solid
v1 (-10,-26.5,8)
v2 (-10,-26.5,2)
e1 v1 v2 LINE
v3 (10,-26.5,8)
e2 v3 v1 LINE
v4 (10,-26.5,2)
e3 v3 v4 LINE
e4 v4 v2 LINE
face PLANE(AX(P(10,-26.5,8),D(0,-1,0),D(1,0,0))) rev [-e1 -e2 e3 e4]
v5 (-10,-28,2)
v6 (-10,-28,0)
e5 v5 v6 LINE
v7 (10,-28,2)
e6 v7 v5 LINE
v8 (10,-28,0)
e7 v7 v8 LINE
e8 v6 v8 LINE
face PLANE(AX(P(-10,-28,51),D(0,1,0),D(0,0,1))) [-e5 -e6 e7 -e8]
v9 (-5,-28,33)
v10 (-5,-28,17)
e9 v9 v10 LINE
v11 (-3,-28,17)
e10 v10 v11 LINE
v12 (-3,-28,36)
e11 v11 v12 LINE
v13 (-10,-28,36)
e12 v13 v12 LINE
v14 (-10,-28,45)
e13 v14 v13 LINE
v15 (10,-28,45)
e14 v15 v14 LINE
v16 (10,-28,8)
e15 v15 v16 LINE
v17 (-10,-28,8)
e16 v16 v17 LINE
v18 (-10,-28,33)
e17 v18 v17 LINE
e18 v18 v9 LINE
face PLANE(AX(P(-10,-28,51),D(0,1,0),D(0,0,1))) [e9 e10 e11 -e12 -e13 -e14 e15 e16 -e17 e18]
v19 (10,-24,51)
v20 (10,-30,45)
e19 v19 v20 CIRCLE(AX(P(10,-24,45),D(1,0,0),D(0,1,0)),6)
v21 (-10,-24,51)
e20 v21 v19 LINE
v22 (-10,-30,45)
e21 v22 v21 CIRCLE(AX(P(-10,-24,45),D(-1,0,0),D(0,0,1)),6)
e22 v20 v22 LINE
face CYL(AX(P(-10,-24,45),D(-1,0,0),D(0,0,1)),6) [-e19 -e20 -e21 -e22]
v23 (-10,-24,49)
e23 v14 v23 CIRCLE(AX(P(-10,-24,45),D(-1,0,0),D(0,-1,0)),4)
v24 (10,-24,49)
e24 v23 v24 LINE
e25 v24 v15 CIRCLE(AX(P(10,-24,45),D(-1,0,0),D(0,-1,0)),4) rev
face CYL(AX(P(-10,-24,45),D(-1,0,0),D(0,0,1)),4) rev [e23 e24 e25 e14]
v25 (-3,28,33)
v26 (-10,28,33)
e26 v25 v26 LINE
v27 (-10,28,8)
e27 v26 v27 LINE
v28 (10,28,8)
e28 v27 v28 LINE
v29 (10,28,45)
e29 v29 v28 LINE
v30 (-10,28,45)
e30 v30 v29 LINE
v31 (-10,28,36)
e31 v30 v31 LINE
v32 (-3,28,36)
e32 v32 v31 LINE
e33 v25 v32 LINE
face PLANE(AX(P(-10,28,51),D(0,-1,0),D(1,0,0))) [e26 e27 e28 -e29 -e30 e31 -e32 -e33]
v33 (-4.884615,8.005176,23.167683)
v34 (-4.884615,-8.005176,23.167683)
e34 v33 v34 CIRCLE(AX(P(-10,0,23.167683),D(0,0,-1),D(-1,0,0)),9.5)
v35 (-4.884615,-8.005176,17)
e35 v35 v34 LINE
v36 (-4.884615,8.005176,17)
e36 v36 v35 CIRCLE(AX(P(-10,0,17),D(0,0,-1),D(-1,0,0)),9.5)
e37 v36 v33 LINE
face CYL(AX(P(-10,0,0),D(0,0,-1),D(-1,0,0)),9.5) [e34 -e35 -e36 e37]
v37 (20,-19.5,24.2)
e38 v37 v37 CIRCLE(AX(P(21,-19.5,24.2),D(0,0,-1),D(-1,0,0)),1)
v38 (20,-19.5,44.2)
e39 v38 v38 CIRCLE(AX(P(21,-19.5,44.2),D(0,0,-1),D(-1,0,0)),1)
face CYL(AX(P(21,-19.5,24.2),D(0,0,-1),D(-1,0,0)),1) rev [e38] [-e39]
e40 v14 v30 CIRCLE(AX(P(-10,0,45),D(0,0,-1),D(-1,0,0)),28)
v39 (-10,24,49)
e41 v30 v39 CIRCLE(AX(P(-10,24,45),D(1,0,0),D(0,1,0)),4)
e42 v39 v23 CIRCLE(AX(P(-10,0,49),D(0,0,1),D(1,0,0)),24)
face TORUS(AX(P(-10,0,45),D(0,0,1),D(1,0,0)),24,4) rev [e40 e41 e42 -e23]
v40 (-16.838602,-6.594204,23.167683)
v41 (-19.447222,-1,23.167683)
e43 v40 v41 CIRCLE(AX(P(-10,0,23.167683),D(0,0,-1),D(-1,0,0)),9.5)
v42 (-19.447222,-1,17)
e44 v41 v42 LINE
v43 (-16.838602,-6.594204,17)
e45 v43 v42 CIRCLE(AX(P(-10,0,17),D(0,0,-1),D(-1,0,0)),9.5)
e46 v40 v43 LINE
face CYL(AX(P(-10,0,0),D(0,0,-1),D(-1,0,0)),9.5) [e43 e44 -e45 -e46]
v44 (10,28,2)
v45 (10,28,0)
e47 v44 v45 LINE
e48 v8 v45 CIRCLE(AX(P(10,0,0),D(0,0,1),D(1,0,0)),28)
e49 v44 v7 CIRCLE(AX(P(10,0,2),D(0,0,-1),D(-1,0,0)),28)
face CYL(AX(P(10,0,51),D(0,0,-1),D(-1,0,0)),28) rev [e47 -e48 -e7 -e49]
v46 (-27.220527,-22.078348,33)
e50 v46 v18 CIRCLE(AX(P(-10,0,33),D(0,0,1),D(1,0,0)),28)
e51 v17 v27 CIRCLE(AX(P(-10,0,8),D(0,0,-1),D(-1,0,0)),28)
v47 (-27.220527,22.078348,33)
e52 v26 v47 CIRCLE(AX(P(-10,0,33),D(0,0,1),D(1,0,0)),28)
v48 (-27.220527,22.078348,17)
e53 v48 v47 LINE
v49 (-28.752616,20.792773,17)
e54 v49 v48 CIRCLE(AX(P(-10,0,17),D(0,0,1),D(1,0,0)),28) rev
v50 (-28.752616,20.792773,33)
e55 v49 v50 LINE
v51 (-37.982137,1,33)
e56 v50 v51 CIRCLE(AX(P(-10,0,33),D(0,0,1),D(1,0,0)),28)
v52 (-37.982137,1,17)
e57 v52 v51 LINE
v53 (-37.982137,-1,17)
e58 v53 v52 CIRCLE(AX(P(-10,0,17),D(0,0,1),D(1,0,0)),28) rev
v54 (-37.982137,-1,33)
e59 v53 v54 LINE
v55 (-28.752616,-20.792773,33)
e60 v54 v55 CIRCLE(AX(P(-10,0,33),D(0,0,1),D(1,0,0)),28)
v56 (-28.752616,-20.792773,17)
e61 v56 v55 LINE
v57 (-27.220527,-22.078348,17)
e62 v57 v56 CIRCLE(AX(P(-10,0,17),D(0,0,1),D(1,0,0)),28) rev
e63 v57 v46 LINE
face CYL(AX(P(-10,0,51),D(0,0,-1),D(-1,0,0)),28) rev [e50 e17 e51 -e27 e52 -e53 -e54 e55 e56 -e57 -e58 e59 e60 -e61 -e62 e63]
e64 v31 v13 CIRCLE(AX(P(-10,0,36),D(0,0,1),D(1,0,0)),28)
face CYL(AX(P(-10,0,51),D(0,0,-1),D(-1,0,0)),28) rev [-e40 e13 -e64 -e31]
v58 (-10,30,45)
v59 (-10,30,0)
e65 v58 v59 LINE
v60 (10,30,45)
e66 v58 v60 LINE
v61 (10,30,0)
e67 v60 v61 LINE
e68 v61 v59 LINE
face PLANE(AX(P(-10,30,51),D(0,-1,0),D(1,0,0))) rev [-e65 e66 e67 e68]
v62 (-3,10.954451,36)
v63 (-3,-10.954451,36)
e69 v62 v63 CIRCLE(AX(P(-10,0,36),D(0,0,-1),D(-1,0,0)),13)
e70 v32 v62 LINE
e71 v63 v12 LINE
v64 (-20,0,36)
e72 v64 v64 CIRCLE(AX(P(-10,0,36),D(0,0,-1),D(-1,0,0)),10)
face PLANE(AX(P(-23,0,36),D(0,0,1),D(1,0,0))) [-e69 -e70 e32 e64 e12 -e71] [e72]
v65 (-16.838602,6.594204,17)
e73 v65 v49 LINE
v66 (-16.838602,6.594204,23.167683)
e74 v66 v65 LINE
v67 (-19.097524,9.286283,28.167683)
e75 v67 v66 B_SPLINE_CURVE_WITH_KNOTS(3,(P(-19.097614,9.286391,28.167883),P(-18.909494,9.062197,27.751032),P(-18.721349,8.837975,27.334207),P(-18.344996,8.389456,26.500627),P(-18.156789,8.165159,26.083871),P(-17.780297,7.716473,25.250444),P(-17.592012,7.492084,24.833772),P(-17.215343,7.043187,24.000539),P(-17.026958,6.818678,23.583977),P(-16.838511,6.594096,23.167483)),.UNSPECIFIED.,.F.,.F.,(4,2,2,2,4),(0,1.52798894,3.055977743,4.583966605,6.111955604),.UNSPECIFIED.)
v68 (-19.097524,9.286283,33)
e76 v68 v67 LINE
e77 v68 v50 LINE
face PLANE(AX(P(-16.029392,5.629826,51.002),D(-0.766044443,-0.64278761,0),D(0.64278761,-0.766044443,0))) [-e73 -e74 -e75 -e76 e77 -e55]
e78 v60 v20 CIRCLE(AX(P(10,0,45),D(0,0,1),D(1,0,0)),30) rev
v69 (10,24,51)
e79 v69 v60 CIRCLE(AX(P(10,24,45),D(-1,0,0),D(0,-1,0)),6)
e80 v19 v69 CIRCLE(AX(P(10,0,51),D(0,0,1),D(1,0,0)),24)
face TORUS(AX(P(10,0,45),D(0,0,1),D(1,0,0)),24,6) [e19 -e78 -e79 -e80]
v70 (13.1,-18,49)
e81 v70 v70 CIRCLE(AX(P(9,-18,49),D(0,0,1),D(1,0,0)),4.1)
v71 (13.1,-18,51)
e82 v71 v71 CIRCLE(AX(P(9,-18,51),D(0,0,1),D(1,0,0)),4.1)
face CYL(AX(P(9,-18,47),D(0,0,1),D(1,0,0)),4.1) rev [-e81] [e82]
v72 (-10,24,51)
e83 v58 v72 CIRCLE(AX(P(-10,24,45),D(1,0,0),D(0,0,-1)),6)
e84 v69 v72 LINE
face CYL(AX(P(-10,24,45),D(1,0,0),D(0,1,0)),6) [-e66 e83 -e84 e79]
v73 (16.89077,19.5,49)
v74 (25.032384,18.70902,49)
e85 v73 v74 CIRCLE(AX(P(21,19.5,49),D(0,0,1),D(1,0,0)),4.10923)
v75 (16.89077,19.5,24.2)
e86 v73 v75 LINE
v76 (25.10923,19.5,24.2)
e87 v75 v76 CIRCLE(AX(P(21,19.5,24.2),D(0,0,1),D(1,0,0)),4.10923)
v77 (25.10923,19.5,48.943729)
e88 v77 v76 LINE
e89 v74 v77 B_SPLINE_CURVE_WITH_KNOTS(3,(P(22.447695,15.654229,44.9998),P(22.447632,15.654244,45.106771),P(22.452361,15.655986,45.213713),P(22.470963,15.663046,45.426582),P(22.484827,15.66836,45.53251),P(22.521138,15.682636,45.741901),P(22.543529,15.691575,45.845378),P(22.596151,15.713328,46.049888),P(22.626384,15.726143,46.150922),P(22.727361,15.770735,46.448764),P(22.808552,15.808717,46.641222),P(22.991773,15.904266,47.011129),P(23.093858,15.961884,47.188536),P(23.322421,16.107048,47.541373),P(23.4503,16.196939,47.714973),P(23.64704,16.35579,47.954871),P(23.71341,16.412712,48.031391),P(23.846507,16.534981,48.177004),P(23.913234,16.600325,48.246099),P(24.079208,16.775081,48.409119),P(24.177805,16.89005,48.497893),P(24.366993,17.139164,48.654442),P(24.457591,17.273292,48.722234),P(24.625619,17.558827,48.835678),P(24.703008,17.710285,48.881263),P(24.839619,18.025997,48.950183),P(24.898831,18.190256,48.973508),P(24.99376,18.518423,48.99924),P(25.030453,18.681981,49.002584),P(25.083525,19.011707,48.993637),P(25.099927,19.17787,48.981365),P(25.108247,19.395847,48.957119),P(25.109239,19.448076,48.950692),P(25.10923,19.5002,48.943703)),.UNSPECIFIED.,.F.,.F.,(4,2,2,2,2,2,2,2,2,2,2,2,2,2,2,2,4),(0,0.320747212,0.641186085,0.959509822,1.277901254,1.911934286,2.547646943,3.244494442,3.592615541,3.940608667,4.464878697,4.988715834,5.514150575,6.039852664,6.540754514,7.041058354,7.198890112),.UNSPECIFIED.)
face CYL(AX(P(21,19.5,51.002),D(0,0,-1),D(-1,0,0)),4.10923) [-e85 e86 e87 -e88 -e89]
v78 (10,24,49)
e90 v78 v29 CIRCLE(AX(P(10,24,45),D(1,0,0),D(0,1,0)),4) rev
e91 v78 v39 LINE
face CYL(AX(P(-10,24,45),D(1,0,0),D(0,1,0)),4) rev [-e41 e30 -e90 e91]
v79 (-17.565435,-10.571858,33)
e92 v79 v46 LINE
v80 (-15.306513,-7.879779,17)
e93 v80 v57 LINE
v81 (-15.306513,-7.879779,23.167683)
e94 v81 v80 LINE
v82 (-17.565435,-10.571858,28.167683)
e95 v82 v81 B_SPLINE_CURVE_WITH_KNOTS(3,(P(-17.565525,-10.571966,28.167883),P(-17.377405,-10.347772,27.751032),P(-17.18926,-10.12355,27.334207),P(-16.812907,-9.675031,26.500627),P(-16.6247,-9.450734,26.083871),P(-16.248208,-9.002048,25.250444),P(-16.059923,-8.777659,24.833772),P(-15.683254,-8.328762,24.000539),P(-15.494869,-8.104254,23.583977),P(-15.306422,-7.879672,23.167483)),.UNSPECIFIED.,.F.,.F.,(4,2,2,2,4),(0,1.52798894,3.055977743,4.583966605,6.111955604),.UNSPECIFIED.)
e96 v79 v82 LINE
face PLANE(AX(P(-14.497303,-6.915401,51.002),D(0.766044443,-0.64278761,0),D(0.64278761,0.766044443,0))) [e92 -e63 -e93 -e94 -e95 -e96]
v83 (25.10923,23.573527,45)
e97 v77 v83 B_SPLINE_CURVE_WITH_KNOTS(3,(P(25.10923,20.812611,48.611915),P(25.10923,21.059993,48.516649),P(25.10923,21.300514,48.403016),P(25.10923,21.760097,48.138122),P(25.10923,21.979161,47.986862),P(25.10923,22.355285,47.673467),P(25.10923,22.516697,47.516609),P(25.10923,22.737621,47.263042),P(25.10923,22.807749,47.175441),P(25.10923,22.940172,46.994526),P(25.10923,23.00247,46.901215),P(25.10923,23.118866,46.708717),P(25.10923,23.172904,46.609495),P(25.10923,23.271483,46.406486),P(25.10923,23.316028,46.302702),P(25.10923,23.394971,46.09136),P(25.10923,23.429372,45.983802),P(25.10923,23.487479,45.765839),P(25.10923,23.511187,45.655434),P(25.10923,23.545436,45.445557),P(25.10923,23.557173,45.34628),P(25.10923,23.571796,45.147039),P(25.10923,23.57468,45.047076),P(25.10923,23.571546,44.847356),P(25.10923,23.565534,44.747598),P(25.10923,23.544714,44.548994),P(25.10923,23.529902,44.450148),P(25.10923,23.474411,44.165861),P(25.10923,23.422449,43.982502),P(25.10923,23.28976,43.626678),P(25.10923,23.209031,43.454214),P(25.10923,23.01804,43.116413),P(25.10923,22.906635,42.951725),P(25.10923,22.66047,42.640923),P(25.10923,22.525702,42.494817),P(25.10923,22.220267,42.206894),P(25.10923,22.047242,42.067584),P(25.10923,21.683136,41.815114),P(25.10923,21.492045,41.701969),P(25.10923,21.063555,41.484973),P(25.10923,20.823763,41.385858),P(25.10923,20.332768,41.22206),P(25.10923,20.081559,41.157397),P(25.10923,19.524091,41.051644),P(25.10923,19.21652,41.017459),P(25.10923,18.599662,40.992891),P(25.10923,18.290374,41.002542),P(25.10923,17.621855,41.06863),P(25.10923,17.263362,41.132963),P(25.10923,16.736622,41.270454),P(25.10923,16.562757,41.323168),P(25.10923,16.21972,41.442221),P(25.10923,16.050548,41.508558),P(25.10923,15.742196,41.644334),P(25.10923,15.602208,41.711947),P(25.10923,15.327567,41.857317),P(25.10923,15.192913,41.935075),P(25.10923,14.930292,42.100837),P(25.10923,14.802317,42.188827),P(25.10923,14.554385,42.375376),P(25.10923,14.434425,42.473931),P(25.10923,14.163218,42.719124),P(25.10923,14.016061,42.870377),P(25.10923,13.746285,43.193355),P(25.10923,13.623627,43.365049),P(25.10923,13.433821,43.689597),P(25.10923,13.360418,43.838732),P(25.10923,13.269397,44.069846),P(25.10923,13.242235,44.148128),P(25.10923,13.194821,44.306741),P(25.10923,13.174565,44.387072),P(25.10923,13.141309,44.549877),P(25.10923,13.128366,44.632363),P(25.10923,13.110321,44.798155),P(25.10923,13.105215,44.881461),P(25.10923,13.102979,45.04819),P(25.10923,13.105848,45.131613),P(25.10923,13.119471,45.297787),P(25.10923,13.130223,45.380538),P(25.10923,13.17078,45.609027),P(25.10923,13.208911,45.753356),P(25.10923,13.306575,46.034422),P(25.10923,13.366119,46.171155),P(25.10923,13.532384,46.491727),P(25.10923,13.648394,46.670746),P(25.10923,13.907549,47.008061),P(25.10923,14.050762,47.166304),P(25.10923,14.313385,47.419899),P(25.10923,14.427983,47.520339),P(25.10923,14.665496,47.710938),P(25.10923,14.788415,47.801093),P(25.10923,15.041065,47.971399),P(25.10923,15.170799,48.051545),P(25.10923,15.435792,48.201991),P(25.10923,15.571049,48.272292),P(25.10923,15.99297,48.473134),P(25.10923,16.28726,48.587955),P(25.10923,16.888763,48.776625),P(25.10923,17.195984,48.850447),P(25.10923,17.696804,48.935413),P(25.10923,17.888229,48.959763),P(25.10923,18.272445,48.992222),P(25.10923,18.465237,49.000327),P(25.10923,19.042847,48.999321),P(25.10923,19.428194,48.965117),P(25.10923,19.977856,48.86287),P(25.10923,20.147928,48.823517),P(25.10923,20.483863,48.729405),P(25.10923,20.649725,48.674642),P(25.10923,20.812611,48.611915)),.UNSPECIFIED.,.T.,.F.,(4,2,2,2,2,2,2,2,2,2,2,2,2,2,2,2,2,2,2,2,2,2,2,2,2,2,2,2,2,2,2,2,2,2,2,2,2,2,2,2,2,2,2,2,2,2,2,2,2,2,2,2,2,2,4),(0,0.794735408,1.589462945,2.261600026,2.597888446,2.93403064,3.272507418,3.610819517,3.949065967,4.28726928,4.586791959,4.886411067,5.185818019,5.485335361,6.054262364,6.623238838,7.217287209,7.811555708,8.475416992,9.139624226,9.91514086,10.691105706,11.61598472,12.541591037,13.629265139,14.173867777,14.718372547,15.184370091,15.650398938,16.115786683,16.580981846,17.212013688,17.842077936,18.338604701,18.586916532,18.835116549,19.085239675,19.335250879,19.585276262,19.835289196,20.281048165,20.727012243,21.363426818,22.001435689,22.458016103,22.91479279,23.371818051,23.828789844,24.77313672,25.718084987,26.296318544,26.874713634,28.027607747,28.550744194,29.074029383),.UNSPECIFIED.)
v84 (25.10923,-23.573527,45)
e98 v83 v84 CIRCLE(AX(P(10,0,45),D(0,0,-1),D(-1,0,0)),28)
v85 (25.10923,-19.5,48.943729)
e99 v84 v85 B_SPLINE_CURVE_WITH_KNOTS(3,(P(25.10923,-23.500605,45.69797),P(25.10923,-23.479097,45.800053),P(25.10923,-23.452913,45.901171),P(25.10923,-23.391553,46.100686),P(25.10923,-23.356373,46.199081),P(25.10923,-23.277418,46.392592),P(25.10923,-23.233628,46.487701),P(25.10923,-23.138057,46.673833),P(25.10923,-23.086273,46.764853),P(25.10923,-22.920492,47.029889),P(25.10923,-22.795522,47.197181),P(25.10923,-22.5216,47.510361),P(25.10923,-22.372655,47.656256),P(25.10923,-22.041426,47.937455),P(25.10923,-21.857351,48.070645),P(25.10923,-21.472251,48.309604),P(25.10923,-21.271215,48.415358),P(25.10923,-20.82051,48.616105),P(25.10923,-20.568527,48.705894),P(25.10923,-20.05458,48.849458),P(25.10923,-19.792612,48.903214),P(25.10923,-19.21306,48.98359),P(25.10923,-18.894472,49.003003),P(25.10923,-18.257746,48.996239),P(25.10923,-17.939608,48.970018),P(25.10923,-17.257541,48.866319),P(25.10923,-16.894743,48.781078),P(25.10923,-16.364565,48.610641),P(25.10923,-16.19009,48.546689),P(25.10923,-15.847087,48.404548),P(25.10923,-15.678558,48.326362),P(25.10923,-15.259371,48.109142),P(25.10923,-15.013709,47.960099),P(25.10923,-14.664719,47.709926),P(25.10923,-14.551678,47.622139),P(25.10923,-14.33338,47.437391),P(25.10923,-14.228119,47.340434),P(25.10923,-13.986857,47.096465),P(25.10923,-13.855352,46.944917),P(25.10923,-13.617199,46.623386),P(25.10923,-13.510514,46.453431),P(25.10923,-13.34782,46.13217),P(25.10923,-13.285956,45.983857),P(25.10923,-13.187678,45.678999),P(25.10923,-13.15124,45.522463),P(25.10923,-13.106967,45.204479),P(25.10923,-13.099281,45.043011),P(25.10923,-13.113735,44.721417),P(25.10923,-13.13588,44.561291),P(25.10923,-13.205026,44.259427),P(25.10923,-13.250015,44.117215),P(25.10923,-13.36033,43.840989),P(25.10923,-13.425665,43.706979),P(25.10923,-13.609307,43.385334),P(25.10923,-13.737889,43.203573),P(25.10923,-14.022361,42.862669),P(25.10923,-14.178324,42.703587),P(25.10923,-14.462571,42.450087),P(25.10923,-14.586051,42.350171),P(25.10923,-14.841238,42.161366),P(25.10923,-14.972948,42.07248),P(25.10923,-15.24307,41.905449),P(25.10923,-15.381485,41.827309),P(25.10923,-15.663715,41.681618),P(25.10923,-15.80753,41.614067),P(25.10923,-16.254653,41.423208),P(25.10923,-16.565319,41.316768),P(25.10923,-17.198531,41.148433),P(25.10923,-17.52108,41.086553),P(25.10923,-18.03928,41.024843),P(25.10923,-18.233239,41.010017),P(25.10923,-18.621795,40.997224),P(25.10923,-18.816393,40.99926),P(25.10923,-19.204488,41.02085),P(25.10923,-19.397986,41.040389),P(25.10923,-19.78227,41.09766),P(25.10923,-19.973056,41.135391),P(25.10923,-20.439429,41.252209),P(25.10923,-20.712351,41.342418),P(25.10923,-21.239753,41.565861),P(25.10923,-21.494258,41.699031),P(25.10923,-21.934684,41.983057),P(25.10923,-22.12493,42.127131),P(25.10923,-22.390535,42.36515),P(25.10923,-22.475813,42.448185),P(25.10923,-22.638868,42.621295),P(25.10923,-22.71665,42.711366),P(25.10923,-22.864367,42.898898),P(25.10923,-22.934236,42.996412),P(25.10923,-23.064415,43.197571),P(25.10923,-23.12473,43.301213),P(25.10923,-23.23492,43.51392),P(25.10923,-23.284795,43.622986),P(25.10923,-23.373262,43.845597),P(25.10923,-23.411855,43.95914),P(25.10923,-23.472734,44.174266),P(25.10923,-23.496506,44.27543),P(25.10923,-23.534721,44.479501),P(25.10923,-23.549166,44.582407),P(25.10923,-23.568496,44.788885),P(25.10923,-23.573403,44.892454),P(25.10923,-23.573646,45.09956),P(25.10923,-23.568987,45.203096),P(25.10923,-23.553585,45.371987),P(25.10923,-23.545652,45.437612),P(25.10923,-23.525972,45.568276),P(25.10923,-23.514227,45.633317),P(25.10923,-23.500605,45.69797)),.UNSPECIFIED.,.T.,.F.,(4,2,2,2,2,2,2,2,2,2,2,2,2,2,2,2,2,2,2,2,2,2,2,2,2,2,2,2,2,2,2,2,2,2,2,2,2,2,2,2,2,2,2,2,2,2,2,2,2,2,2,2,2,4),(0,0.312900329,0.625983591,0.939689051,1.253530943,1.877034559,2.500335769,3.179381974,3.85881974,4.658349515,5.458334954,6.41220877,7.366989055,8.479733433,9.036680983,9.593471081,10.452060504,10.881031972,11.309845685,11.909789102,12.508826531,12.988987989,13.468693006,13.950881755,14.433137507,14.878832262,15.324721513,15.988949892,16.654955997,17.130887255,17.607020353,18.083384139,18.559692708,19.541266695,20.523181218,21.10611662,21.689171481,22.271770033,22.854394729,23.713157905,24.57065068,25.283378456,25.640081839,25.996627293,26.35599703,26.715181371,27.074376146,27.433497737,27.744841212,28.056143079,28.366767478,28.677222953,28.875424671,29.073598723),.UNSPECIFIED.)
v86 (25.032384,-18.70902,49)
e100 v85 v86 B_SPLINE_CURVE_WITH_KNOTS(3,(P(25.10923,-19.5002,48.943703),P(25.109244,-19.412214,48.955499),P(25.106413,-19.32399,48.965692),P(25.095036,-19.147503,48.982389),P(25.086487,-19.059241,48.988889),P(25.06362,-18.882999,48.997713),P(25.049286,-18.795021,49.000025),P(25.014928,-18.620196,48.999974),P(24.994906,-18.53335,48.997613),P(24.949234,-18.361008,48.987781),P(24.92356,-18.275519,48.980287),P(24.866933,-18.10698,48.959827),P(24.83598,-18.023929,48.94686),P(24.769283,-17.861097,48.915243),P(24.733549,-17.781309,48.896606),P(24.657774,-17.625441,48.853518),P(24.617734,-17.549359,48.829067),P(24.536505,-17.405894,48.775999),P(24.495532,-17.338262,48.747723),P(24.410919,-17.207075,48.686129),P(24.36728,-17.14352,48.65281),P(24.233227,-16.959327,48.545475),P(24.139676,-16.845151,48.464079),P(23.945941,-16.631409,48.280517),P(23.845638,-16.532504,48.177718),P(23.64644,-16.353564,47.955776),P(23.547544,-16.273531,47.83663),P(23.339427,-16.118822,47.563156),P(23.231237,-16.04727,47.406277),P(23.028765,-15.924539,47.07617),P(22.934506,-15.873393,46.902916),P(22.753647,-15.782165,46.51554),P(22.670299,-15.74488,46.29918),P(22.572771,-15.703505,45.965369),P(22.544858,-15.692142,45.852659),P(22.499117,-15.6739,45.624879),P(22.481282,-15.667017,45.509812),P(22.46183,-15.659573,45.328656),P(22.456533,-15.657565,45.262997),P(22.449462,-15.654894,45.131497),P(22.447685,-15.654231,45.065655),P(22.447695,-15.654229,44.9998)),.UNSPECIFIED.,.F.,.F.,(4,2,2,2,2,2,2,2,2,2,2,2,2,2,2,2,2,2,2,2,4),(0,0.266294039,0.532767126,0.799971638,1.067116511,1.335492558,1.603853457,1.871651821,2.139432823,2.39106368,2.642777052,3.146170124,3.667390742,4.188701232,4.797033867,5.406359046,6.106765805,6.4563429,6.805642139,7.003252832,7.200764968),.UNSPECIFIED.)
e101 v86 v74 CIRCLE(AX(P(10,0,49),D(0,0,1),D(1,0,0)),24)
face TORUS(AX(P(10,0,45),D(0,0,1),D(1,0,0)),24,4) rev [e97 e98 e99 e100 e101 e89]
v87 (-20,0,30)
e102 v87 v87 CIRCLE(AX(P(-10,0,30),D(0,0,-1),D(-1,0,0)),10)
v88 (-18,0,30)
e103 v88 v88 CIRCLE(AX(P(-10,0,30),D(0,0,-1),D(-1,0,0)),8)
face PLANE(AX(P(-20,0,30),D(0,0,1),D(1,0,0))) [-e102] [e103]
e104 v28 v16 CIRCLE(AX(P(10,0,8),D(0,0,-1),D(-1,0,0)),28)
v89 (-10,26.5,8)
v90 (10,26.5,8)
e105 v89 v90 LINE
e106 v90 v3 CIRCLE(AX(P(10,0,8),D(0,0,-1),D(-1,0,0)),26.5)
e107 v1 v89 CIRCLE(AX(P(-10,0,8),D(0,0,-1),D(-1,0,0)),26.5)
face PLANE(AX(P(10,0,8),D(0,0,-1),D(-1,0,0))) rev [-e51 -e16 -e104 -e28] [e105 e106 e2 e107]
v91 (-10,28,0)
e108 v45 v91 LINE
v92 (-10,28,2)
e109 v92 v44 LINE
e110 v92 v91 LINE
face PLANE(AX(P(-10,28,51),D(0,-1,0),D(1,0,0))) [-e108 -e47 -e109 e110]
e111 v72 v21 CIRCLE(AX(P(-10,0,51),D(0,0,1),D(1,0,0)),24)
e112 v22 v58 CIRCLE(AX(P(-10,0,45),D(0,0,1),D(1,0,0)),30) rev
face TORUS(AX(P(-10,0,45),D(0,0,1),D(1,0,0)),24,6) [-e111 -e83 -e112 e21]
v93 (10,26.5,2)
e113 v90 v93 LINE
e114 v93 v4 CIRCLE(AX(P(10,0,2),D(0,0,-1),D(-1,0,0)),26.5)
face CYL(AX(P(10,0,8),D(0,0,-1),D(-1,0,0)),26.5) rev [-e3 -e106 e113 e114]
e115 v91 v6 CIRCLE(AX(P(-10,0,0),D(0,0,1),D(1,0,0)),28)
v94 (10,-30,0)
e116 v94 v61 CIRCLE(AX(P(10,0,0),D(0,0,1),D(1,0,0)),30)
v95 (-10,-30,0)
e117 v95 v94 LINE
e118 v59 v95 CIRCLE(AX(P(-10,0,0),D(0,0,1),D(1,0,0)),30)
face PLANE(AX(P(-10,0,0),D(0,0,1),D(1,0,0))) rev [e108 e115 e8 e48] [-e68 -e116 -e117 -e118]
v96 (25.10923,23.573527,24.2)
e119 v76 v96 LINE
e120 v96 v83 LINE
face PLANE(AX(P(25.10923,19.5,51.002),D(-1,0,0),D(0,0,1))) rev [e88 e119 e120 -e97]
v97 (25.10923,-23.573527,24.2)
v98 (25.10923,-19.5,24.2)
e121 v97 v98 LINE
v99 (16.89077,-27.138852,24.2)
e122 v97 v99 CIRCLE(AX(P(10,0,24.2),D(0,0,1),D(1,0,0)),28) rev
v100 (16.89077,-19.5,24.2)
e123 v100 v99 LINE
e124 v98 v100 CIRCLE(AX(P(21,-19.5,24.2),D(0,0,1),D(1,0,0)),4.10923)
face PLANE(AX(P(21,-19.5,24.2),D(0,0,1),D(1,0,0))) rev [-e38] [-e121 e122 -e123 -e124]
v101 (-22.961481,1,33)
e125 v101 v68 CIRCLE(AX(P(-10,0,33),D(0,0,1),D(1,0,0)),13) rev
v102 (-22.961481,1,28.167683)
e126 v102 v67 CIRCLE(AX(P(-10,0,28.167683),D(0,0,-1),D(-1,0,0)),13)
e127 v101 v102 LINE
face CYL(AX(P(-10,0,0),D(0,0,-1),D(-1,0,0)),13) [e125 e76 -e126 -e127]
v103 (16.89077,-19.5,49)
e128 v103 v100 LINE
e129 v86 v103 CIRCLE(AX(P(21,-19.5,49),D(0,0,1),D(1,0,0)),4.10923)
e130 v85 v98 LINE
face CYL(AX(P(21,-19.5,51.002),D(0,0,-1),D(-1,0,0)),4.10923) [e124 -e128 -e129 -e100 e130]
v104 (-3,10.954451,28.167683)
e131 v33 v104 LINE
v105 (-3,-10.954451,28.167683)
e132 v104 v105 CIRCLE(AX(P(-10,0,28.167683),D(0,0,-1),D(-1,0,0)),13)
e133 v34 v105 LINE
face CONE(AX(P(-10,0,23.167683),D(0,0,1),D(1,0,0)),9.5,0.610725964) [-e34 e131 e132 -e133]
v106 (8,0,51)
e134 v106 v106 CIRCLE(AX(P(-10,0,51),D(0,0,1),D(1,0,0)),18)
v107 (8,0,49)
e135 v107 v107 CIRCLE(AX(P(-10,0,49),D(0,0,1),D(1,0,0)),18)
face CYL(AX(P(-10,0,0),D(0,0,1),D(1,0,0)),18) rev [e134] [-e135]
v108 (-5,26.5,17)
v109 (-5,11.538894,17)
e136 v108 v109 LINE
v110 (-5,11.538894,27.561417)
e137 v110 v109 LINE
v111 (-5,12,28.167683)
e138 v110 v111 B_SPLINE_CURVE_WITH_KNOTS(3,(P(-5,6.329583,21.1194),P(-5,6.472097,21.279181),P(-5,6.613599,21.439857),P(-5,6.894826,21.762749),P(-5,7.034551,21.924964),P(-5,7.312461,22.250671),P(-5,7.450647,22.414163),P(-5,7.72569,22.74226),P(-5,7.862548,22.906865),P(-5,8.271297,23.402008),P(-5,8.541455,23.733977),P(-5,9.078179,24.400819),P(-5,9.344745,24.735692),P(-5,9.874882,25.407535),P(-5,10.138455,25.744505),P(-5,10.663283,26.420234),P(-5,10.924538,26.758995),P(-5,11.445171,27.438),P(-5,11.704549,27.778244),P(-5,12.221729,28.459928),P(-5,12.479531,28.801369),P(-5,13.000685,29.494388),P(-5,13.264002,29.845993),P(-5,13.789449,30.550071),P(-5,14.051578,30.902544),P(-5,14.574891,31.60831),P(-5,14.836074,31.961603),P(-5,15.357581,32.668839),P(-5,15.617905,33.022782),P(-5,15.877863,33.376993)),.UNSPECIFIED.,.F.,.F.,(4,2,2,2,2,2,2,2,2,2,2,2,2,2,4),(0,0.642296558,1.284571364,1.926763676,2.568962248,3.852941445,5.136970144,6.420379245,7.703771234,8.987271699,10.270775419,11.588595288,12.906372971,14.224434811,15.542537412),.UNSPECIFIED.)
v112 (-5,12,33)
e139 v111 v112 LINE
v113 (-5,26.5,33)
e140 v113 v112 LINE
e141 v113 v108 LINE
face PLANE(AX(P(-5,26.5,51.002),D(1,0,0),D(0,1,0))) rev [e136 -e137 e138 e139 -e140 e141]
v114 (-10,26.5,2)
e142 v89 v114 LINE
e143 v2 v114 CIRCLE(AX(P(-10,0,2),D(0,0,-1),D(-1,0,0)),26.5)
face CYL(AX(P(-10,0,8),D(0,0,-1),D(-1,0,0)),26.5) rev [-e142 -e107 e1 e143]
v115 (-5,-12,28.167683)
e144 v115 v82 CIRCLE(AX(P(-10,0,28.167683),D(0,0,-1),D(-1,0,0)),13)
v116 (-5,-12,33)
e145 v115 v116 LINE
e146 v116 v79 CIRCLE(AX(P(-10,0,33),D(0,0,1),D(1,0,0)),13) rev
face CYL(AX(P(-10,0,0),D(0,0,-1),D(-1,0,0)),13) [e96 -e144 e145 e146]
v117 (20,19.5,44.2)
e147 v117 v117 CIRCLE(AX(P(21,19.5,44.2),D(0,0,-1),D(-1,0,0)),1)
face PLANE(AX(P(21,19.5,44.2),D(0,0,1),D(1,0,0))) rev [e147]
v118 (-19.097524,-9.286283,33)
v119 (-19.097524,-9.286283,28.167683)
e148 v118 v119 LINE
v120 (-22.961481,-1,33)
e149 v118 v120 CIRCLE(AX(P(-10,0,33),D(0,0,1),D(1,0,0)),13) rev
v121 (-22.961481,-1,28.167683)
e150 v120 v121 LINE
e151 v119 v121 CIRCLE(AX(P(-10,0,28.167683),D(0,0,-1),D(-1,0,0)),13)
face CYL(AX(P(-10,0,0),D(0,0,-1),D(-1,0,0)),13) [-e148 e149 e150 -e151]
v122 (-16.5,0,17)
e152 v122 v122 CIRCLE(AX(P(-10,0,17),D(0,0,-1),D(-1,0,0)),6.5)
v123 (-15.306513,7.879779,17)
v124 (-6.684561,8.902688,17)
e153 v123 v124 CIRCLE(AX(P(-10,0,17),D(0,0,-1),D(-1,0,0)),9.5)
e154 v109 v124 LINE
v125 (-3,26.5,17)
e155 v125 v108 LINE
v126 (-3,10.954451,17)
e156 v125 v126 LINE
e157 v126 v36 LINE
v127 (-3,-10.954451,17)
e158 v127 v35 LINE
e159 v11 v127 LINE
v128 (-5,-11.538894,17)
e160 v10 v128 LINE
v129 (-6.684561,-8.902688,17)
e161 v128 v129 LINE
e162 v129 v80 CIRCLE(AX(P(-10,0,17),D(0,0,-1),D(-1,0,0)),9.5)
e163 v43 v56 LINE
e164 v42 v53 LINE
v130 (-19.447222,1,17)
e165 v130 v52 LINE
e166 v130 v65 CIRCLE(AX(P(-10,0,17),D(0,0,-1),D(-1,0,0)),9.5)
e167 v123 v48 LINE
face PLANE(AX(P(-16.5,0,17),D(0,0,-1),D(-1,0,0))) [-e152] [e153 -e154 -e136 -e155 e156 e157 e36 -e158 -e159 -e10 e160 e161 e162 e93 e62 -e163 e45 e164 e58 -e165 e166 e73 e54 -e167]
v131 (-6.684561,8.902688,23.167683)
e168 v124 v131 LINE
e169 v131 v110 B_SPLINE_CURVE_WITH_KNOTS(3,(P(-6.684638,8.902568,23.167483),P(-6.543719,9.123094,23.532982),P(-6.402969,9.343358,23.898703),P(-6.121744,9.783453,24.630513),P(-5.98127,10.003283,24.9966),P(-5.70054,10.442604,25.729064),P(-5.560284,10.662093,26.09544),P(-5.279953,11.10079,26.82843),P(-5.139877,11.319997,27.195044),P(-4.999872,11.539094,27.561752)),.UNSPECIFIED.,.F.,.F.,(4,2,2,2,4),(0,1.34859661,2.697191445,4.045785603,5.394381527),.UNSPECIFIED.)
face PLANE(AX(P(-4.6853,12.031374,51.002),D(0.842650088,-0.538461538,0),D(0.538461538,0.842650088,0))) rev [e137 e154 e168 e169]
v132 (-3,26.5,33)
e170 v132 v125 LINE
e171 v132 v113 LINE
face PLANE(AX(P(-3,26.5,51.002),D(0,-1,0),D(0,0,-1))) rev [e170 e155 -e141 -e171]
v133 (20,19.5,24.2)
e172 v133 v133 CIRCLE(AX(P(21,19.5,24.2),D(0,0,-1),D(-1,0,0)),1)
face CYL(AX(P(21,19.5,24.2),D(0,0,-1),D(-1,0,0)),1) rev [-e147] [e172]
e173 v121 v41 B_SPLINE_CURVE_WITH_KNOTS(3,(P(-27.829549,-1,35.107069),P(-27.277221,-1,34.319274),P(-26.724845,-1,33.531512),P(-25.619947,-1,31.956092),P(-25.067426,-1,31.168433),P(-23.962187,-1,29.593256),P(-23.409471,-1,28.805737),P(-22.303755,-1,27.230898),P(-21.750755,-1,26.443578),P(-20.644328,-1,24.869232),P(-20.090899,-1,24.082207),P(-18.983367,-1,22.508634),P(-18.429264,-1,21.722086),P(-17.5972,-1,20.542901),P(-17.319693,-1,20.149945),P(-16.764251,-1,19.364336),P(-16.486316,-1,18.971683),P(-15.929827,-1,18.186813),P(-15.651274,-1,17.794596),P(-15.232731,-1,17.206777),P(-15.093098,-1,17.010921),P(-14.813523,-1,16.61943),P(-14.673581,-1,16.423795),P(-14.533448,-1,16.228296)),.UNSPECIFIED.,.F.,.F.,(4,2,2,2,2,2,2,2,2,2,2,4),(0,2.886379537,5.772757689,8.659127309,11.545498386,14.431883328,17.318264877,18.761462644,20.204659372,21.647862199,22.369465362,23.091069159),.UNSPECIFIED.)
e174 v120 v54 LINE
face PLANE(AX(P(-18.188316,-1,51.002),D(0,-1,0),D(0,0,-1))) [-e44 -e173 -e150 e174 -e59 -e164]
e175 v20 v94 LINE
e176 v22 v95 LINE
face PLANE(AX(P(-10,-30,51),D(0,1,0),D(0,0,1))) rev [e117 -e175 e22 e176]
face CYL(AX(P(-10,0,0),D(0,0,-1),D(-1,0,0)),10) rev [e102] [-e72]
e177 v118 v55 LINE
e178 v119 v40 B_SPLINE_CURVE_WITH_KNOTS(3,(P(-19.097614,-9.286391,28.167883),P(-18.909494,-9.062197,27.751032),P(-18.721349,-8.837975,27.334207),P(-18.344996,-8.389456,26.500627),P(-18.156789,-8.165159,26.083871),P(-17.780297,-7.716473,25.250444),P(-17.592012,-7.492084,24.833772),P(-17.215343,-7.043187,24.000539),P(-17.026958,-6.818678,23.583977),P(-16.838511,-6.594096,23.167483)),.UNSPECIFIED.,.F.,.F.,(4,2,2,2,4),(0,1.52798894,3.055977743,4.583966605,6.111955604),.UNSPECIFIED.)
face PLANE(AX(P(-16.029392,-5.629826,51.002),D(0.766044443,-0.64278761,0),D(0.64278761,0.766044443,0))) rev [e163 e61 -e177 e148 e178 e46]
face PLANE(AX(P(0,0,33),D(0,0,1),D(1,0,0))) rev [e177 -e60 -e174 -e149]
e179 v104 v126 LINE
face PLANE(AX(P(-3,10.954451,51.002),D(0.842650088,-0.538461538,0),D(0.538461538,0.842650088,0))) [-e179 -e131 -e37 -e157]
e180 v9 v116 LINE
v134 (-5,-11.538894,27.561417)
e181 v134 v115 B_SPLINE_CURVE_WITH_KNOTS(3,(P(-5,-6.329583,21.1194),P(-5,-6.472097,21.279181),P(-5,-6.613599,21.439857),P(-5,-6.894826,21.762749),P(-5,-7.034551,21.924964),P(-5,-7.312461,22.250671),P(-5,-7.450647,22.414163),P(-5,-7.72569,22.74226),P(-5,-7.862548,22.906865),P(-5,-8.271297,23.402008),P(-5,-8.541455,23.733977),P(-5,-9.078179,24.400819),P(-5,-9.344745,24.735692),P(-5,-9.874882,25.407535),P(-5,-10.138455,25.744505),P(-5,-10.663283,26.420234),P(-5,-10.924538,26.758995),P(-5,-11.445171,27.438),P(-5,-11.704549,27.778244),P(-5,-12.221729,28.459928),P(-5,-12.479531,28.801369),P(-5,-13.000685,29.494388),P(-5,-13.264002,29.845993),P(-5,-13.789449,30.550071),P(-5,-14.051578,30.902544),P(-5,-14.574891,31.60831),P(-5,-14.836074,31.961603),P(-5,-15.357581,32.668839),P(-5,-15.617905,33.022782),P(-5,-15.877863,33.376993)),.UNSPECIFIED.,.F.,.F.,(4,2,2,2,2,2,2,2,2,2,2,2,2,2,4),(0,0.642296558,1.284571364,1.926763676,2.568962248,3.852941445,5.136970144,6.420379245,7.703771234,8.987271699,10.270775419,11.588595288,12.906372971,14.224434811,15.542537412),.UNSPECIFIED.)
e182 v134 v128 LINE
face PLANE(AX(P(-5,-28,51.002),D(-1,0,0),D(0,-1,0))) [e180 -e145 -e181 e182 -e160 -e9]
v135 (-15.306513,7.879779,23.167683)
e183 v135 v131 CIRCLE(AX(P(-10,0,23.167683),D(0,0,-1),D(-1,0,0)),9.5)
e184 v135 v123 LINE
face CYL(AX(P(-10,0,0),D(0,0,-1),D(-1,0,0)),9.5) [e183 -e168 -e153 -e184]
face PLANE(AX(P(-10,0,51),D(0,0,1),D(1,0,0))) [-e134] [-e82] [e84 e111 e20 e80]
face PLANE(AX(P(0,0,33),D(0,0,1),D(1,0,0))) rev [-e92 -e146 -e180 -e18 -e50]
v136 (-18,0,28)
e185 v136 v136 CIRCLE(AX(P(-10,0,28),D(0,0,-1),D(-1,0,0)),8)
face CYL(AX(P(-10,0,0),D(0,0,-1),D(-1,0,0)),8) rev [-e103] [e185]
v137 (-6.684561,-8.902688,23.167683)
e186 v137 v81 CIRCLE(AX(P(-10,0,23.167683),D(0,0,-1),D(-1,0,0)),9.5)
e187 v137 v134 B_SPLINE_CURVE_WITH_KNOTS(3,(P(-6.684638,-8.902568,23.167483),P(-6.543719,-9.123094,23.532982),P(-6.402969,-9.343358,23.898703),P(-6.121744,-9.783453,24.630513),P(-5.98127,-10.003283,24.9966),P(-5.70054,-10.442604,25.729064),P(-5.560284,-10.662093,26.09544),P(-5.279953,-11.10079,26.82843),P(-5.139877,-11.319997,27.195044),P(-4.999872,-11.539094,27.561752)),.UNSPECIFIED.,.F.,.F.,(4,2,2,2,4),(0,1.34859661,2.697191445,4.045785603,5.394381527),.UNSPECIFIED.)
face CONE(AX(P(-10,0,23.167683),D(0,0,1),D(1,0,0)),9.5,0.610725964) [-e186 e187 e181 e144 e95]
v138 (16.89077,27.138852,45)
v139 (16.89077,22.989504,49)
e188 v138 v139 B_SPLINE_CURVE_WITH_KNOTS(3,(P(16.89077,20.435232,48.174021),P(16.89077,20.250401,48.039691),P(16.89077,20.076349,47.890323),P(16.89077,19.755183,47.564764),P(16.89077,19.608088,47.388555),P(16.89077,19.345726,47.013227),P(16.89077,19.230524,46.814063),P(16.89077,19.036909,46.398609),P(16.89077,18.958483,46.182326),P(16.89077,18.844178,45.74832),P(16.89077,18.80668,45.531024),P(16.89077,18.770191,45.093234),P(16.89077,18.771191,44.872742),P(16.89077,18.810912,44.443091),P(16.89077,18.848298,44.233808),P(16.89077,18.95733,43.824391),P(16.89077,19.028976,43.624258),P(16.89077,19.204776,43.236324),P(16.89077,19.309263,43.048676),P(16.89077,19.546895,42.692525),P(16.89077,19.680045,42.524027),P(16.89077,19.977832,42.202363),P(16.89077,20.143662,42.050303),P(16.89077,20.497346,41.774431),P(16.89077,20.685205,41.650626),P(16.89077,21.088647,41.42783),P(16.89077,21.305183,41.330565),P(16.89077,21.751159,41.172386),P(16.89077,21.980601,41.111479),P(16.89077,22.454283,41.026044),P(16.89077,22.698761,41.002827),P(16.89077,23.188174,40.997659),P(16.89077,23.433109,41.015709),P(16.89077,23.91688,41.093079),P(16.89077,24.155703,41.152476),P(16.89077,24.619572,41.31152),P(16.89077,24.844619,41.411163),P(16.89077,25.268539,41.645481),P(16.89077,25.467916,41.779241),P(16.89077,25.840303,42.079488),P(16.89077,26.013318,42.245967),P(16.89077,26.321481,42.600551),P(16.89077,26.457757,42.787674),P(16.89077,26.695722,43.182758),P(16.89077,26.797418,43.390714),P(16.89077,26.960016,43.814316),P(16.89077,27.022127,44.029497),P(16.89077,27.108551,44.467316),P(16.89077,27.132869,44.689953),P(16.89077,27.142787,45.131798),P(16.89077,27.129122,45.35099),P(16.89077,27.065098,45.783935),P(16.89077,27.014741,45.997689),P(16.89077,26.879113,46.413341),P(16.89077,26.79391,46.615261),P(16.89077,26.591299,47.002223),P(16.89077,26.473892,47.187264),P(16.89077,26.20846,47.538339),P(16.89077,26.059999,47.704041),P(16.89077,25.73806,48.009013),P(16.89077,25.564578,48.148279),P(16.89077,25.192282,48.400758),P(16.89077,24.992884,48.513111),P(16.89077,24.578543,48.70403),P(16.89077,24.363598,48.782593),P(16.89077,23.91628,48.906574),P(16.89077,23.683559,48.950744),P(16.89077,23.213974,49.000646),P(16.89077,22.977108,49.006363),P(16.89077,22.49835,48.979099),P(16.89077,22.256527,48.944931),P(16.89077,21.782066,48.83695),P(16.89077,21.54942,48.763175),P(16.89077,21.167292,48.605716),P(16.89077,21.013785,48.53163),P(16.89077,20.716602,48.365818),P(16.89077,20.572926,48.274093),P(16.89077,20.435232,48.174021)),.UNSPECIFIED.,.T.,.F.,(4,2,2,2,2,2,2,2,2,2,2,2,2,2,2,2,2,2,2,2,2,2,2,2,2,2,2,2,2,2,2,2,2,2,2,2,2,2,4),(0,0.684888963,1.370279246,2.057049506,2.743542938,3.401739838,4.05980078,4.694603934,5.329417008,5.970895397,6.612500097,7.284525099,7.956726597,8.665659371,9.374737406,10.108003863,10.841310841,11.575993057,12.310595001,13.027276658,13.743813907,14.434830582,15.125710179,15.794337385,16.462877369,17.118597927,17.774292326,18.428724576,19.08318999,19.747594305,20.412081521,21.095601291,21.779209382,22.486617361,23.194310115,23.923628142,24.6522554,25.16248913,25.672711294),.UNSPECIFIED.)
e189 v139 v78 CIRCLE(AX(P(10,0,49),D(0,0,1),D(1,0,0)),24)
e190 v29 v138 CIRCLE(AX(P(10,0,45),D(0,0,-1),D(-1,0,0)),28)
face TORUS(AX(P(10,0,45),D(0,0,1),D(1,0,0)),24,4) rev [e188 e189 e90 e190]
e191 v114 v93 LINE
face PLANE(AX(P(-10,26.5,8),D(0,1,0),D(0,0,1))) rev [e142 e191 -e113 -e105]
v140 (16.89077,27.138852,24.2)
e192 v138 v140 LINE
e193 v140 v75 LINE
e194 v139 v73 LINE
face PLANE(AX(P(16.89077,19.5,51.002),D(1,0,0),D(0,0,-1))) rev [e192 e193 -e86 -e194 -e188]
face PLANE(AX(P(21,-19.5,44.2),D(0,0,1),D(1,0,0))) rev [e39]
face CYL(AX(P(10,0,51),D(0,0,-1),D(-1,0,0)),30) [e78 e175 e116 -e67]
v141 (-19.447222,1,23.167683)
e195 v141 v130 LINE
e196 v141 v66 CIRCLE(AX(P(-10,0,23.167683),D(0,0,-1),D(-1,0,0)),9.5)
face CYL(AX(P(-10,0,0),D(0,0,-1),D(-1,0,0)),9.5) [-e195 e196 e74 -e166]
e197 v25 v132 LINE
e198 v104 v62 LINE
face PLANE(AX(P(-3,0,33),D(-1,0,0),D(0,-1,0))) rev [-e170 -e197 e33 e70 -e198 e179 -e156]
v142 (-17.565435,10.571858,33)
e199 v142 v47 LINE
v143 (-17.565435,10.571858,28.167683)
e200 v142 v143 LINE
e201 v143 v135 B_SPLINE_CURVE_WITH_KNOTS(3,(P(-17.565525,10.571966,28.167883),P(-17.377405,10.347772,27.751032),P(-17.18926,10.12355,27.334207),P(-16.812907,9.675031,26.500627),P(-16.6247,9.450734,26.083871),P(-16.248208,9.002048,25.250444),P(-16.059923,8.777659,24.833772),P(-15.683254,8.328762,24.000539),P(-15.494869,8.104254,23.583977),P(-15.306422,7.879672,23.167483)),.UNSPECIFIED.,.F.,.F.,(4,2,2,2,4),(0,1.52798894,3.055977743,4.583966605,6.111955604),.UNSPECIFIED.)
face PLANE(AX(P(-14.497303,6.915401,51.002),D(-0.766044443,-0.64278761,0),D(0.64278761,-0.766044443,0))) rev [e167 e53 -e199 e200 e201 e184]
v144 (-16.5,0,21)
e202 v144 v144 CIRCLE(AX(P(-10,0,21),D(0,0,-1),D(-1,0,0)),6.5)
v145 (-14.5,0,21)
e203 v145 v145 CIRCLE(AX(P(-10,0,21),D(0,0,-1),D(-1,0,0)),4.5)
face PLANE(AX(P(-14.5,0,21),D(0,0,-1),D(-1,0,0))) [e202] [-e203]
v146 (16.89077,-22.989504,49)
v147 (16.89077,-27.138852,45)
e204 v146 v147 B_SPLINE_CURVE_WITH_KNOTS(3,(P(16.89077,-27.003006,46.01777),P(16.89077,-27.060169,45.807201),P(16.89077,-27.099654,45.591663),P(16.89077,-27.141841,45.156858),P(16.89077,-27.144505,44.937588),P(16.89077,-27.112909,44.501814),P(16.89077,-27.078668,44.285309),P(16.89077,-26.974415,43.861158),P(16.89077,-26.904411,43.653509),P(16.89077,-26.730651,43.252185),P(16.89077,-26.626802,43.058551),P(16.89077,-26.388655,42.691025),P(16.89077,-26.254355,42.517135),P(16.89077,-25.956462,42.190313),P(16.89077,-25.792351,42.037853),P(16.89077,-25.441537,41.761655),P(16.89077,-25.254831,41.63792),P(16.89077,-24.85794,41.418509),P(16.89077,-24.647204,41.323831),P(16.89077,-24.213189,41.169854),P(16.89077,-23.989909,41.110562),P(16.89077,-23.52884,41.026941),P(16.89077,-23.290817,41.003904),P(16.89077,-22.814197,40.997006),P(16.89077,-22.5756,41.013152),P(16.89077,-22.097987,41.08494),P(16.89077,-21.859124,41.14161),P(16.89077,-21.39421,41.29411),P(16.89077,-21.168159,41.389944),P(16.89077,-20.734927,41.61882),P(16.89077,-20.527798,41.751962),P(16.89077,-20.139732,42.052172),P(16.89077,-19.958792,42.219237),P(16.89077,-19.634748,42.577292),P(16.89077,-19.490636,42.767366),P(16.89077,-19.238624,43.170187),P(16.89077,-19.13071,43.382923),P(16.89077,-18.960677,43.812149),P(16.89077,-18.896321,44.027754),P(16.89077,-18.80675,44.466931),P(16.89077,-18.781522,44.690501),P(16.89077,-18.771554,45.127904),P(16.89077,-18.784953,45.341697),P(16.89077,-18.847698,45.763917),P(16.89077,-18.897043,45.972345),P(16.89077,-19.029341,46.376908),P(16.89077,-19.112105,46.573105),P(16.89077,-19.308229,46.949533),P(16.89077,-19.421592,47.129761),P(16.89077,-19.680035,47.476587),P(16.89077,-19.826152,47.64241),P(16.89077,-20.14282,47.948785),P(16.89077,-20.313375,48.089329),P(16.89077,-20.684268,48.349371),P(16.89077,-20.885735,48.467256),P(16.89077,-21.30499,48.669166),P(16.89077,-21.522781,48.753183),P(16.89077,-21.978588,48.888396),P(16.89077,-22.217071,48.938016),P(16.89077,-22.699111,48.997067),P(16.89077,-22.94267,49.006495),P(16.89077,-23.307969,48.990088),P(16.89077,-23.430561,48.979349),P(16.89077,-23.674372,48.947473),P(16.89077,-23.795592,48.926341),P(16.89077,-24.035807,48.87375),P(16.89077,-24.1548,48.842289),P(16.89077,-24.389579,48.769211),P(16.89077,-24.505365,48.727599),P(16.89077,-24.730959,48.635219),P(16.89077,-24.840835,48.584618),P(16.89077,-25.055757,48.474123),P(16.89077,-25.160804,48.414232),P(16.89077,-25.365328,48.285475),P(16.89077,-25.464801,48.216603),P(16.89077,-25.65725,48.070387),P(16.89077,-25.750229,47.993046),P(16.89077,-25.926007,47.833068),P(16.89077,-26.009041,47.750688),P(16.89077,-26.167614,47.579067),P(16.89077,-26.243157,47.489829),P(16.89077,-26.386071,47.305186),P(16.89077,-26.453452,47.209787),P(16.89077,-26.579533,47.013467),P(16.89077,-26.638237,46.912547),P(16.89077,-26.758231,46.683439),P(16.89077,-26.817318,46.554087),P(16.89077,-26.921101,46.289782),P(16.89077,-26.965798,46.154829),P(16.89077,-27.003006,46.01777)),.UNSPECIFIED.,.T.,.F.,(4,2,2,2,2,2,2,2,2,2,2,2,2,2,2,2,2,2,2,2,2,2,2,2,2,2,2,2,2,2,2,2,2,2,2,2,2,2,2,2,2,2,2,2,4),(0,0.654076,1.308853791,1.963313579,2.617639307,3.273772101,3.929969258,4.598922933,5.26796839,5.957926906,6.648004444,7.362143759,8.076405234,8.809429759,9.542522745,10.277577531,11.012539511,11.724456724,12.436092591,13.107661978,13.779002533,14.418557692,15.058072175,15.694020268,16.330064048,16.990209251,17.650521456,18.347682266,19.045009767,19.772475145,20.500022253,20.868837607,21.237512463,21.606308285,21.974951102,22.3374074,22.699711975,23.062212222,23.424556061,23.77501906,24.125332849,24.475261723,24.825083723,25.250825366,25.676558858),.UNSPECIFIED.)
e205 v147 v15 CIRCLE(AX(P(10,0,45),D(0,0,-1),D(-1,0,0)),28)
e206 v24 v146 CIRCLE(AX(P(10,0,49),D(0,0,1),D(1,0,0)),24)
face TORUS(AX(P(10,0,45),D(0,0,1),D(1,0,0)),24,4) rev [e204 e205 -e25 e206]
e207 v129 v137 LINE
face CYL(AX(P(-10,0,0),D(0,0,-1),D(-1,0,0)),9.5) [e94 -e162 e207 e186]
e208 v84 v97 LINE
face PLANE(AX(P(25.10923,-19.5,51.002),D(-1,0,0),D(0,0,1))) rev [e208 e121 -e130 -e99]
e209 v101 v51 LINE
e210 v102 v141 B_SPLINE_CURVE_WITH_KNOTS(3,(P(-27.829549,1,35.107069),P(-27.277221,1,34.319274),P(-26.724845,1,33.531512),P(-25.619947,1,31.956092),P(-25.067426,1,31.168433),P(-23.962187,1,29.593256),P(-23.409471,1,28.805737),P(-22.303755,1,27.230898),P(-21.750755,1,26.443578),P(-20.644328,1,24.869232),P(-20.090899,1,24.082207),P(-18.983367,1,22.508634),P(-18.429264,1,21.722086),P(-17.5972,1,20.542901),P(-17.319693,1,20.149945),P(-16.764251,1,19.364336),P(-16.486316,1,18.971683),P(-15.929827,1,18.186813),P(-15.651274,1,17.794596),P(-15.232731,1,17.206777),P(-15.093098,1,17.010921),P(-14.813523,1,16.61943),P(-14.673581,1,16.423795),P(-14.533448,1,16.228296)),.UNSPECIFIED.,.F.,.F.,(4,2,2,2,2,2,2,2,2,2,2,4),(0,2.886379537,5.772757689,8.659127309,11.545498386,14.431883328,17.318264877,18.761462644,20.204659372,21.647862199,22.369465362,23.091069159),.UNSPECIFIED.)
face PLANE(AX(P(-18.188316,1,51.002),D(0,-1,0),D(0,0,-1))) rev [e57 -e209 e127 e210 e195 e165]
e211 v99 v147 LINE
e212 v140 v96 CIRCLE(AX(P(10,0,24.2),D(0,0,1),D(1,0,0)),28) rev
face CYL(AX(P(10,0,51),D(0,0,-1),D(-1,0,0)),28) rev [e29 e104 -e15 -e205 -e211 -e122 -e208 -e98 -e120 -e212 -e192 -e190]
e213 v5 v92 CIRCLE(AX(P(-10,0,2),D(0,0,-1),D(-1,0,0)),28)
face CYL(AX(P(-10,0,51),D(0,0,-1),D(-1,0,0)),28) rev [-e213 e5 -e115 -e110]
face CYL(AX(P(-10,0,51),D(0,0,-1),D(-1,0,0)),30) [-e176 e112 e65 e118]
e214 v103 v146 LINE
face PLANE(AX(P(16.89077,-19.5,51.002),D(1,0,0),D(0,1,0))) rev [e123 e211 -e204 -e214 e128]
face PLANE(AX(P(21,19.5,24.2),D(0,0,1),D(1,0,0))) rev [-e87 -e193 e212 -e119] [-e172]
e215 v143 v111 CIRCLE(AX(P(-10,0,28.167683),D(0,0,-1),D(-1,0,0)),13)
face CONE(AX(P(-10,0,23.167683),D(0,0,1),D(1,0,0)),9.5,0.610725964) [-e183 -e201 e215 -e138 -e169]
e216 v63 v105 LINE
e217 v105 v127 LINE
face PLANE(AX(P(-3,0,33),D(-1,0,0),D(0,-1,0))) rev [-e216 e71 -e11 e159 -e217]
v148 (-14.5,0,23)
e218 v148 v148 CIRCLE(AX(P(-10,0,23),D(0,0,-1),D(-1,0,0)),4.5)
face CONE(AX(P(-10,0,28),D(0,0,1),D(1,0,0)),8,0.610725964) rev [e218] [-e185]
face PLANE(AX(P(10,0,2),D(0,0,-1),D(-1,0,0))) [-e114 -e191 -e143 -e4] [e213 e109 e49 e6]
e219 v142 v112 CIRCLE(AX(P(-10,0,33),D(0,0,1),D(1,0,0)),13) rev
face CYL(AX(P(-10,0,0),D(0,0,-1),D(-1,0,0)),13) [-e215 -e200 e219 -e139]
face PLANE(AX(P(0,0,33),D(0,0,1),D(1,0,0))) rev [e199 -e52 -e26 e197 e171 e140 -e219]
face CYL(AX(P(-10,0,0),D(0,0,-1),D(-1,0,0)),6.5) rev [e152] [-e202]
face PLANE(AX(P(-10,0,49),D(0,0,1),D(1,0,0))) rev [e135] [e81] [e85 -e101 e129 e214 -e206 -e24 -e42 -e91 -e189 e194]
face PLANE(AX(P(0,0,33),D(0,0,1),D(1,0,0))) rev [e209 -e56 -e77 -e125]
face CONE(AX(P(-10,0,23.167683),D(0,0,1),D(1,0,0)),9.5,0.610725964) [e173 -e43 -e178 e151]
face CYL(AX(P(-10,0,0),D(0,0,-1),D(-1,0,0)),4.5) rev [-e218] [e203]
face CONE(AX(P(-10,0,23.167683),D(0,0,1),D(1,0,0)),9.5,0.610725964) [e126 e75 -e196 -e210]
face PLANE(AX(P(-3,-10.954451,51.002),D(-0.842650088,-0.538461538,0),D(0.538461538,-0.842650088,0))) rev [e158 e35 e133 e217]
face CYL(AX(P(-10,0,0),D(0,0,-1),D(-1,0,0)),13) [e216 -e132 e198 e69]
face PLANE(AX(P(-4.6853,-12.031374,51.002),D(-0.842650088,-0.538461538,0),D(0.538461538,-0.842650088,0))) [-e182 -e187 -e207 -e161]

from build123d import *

# Parameters (mm, degrees)
EXTRUDE_1_DEPTH     = 51
FILLET_1_R          = 6
SHELL_1_T           = -2
SKETCH_3_R          = 18
CUT_EXTRUDE_1_DEPTH = 72.421285343
SKETCH_5_R          = 4.1
CUT_EXTRUDE_2_DEPTH = 4
EXTRUDE_START       = -2
EXTRUDE_2_DEPTH     = 6
EXTRUDE_START_2     = -3
EXTRUDE_3_DEPTH     = 3
EXTRUDE_32_REACH    = 62.465
EXTRUDE_36_REACH    = 62.465
EXTRUDE_37_REACH    = 62.465
SKETCH_14_W         = 19.811684382
SKETCH_14_H         = 2
EXTRUDE_4_DEPTH     = 24.8
HOLE_WIZARD_1_D     = 2
HOLE_WIZARD_1_DEPTH = 20


# Read off the part's stored shape, not the designer's step: 凸台-拉伸4
with BuildPart() as part:
    # 草图2 → 凸台-拉伸1 (new body)
    with BuildSketch(Plane.XY):
        with BuildLine():
            Line((-10, 30), (10, 30))
            ThreePointArc((10, 30), (40, 0), (10, -30))
            Line((10, -30), (-10, -30))
            ThreePointArc((-10, -30), (-40, 0), (-10, 30))
        make_face()
    extrude(amount=EXTRUDE_1_DEPTH)

    # 圆角1
    fillet_1_edges = [part.edges().sort_by_distance(p)[0] for p in [
        (40, 0, 51),
        (0, 30, 51),
        (-40, 0, 51),
        (0, -30, 51),
    ]]
    fillet(fillet_1_edges, radius=FILLET_1_R)

    # 抽壳1
    shell_1_openings = [part.faces().sort_by_distance(p)[0] for p in [
        (0, 0, 0),
    ]]
    offset(amount=SHELL_1_T, openings=shell_1_openings, kind=Kind.INTERSECTION)

    # 草图3 → 切除-拉伸1 (cut, through all)
    with BuildSketch(Plane.XY.offset(51)):
        with Locations((-10, 0)):
            Circle(SKETCH_3_R)
    extrude(amount=-CUT_EXTRUDE_1_DEPTH, mode=Mode.SUBTRACT)

    # 草图5 → 切除-拉伸2 (cut)
    with BuildSketch(Plane.XY.offset(51)):
        with Locations((9, -18)):
            Circle(SKETCH_5_R)
    extrude(amount=-CUT_EXTRUDE_2_DEPTH, mode=Mode.SUBTRACT)

    # 草图6 → 凸台-拉伸2 (add)
    with BuildSketch(Plane(origin=(0, 0, 0), x_dir=(-1, 0, 0), z_dir=(0, 0, -1)).offset(EXTRUDE_START)):
        with BuildLine():
            Line((10, 28), (-10, 28))
            ThreePointArc((-10, 28), (-38, 0), (-10, -28))
            Line((-10, -28), (10, -28))
            ThreePointArc((10, -28), (38, 0), (10, 28))
        make_face()
        with BuildLine():
            Line((10, 26.5), (-10, 26.5))
            ThreePointArc((-10, 26.5), (-36.5, 0), (-10, -26.5))
            Line((-10, -26.5), (10, -26.5))
            ThreePointArc((10, -26.5), (36.5, 0), (10, 26.5))
        make_face(mode=Mode.SUBTRACT)
    extrude(amount=-EXTRUDE_2_DEPTH)



with BuildPart() as body_2:
    # 草图4 → 旋转1 (revolve)
    with BuildSketch(Plane(origin=(0, 0, 0), x_dir=(1, 0, 0), z_dir=(0, 1, 0))):
        Polygon((-20, -36), (-20, -30), (-18, -30), (-18, -28), (-14.5, -23), (-14.5, -21), (-16.5, -21), (-16.5, -17), (-19.5, -17), (-19.5, -23.167682505), (-23, -28.167682505), (-23, -36), align=None)
    revolve(axis=Axis((-10, 0, 0), (0, 0, 1)))


with BuildPart() as part_1:
    add(part.part)

    add(body_2.part)  # 凸台-拉伸3 merges body 2
    # 草图7 → 凸台-拉伸3 (add)
    with BuildSketch(Plane.XY.offset(36).offset(EXTRUDE_START_2)):
        with BuildLine():
            Line((-3, 7.141428429), (-3, 28))
            Line((-3, 28), (-10, 28))
            ThreePointArc((-10, 28), (-38, 0), (-10, -28))
            Line((-10, -28), (-3, -28))
            Line((-3, -28), (-3, -7.141428429))
            ThreePointArc((-3, -7.141428429), (-20, 0), (-3, 7.141428429))
        make_face()
    extrude(amount=EXTRUDE_3_DEPTH)

    # 草图12 → 拉伸-薄壁32 (add, up to next)
    with BuildSketch(Plane(origin=(0, 0, 17), x_dir=(-1, 0, 0), z_dir=(0, 0, -1)), mode=Mode.PRIVATE) as extrude_32_sk1:
        Polygon((3, -28), (3, -10.95445115), (6.5, -5.477225575), (8.185300177, -6.554148652), (5, -11.538893679), (5, -28), align=None)
    extrude_32_tool1 = extrude(extrude_32_sk1.sketch, amount=-EXTRUDE_32_REACH, mode=Mode.PRIVATE) - part_1.part
    add(extrude_32_tool1.solids().sort_by_distance((-4.44371, -16.649108, 17))[0])

    # 草图12<6> → 拉伸-薄壁36 (add, up to next)
    with BuildSketch(Plane(origin=(0, 0, 17), x_dir=(-1, 0, 0), z_dir=(0, 0, -1)), mode=Mode.PRIVATE) as extrude_36_sk1:
        Polygon((3, 26.5), (3, 10.95445115), (6.5, 5.477225575), (8.185300177, 6.554148652), (5, 11.538893679), (5, 26.5), align=None)
    extrude_36_tool1 = extrude(extrude_36_sk1.sketch, amount=-EXTRUDE_36_REACH, mode=Mode.PRIVATE) - part_1.part
    add(extrude_36_tool1.solids().sort_by_distance((-4.474722, 15.908171, 17))[0])

    # 草图14 → 拉伸-薄壁37 (add, up to next)
    with BuildSketch(Plane(origin=(0, 0, 17), x_dir=(-1, 0, 0), z_dir=(0, 0, -1)), mode=Mode.PRIVATE) as extrude_37_sk1:
        with Locations((28.094157809, 0)):
            Rectangle(SKETCH_14_W, SKETCH_14_H)
    extrude_37_tool1 = extrude(extrude_37_sk1.sketch, amount=-EXTRUDE_37_REACH, mode=Mode.PRIVATE) - part_1.part
    # 草图14 → 拉伸-薄壁37 (add, up to next)
    with BuildSketch(Plane(origin=(0, 0, 17), x_dir=(-1, 0, 0), z_dir=(0, 0, -1)), mode=Mode.PRIVATE) as extrude_37_sk2:
        Polygon((16.029392267, 5.629826068), (28.764097514, 20.806456798), (27.232008628, 22.092032017), (14.49730338, 6.915401287), align=None)
    extrude_37_tool2 = extrude(extrude_37_sk2.sketch, amount=-EXTRUDE_37_REACH, mode=Mode.PRIVATE) - part_1.part
    # 草图14 → 拉伸-薄壁37 (add, up to next)
    with BuildSketch(Plane(origin=(0, 0, 17), x_dir=(-1, 0, 0), z_dir=(0, 0, -1)), mode=Mode.PRIVATE) as extrude_37_sk3:
        Polygon((14.49730338, -6.915401287), (27.232008628, -22.092032017), (28.764097514, -20.806456798), (16.029392267, -5.629826068), align=None)
    extrude_37_tool3 = extrude(extrude_37_sk3.sketch, amount=-EXTRUDE_37_REACH, mode=Mode.PRIVATE) - part_1.part
    add(extrude_37_tool1.solids().sort_by_distance((-28.094158, 0, 17))[0])
    add(extrude_37_tool2.solids().sort_by_distance((-21.6307, 13.860929, 17))[0])
    add(extrude_37_tool3.solids().sort_by_distance((-21.6307, -13.860929, 17))[0])

    # 凸台-拉伸4 outline → 凸台-拉伸4 (add)
    with BuildSketch(Plane.XY.offset(24.2)):
        with BuildLine():
            ThreePointArc((16.890769815, -27.138852064), (21.143513187, -25.687002819), (25.109230185, -23.573526745))
            Line((25.109230185, -23.573526745), (25.109230185, -19.500000001))
            ThreePointArc((25.109230185, -19.500000001), (21.000000001, -15.390769815), (16.890769815, -19.5))
            Line((16.890769815, -19.5), (16.890769815, -27.138852064))
        make_face()
        with BuildLine():
            ThreePointArc((16.890769815, 19.5), (21.000000001, 15.390769815), (25.109230185, 19.500000001))
            Line((25.109230185, 19.500000001), (25.109230185, 23.573526745))
            ThreePointArc((25.109230185, 23.573526745), (21.143513187, 25.687002819), (16.890769815, 27.138852064))
            Line((16.890769815, 27.138852064), (16.890769815, 19.5))
        make_face()
    extrude(amount=EXTRUDE_4_DEPTH)

    # 孔1
    with Locations(Plane(origin=(0, 0, 24.2), x_dir=(-1, 0, 0), z_dir=(0, 0, -1))):
        with Locations((-21, 19.5), (-21, -19.5)):
            Hole(HOLE_WIZARD_1_D / 2, depth=HOLE_WIZARD_1_DEPTH)


solid = part_1.part
